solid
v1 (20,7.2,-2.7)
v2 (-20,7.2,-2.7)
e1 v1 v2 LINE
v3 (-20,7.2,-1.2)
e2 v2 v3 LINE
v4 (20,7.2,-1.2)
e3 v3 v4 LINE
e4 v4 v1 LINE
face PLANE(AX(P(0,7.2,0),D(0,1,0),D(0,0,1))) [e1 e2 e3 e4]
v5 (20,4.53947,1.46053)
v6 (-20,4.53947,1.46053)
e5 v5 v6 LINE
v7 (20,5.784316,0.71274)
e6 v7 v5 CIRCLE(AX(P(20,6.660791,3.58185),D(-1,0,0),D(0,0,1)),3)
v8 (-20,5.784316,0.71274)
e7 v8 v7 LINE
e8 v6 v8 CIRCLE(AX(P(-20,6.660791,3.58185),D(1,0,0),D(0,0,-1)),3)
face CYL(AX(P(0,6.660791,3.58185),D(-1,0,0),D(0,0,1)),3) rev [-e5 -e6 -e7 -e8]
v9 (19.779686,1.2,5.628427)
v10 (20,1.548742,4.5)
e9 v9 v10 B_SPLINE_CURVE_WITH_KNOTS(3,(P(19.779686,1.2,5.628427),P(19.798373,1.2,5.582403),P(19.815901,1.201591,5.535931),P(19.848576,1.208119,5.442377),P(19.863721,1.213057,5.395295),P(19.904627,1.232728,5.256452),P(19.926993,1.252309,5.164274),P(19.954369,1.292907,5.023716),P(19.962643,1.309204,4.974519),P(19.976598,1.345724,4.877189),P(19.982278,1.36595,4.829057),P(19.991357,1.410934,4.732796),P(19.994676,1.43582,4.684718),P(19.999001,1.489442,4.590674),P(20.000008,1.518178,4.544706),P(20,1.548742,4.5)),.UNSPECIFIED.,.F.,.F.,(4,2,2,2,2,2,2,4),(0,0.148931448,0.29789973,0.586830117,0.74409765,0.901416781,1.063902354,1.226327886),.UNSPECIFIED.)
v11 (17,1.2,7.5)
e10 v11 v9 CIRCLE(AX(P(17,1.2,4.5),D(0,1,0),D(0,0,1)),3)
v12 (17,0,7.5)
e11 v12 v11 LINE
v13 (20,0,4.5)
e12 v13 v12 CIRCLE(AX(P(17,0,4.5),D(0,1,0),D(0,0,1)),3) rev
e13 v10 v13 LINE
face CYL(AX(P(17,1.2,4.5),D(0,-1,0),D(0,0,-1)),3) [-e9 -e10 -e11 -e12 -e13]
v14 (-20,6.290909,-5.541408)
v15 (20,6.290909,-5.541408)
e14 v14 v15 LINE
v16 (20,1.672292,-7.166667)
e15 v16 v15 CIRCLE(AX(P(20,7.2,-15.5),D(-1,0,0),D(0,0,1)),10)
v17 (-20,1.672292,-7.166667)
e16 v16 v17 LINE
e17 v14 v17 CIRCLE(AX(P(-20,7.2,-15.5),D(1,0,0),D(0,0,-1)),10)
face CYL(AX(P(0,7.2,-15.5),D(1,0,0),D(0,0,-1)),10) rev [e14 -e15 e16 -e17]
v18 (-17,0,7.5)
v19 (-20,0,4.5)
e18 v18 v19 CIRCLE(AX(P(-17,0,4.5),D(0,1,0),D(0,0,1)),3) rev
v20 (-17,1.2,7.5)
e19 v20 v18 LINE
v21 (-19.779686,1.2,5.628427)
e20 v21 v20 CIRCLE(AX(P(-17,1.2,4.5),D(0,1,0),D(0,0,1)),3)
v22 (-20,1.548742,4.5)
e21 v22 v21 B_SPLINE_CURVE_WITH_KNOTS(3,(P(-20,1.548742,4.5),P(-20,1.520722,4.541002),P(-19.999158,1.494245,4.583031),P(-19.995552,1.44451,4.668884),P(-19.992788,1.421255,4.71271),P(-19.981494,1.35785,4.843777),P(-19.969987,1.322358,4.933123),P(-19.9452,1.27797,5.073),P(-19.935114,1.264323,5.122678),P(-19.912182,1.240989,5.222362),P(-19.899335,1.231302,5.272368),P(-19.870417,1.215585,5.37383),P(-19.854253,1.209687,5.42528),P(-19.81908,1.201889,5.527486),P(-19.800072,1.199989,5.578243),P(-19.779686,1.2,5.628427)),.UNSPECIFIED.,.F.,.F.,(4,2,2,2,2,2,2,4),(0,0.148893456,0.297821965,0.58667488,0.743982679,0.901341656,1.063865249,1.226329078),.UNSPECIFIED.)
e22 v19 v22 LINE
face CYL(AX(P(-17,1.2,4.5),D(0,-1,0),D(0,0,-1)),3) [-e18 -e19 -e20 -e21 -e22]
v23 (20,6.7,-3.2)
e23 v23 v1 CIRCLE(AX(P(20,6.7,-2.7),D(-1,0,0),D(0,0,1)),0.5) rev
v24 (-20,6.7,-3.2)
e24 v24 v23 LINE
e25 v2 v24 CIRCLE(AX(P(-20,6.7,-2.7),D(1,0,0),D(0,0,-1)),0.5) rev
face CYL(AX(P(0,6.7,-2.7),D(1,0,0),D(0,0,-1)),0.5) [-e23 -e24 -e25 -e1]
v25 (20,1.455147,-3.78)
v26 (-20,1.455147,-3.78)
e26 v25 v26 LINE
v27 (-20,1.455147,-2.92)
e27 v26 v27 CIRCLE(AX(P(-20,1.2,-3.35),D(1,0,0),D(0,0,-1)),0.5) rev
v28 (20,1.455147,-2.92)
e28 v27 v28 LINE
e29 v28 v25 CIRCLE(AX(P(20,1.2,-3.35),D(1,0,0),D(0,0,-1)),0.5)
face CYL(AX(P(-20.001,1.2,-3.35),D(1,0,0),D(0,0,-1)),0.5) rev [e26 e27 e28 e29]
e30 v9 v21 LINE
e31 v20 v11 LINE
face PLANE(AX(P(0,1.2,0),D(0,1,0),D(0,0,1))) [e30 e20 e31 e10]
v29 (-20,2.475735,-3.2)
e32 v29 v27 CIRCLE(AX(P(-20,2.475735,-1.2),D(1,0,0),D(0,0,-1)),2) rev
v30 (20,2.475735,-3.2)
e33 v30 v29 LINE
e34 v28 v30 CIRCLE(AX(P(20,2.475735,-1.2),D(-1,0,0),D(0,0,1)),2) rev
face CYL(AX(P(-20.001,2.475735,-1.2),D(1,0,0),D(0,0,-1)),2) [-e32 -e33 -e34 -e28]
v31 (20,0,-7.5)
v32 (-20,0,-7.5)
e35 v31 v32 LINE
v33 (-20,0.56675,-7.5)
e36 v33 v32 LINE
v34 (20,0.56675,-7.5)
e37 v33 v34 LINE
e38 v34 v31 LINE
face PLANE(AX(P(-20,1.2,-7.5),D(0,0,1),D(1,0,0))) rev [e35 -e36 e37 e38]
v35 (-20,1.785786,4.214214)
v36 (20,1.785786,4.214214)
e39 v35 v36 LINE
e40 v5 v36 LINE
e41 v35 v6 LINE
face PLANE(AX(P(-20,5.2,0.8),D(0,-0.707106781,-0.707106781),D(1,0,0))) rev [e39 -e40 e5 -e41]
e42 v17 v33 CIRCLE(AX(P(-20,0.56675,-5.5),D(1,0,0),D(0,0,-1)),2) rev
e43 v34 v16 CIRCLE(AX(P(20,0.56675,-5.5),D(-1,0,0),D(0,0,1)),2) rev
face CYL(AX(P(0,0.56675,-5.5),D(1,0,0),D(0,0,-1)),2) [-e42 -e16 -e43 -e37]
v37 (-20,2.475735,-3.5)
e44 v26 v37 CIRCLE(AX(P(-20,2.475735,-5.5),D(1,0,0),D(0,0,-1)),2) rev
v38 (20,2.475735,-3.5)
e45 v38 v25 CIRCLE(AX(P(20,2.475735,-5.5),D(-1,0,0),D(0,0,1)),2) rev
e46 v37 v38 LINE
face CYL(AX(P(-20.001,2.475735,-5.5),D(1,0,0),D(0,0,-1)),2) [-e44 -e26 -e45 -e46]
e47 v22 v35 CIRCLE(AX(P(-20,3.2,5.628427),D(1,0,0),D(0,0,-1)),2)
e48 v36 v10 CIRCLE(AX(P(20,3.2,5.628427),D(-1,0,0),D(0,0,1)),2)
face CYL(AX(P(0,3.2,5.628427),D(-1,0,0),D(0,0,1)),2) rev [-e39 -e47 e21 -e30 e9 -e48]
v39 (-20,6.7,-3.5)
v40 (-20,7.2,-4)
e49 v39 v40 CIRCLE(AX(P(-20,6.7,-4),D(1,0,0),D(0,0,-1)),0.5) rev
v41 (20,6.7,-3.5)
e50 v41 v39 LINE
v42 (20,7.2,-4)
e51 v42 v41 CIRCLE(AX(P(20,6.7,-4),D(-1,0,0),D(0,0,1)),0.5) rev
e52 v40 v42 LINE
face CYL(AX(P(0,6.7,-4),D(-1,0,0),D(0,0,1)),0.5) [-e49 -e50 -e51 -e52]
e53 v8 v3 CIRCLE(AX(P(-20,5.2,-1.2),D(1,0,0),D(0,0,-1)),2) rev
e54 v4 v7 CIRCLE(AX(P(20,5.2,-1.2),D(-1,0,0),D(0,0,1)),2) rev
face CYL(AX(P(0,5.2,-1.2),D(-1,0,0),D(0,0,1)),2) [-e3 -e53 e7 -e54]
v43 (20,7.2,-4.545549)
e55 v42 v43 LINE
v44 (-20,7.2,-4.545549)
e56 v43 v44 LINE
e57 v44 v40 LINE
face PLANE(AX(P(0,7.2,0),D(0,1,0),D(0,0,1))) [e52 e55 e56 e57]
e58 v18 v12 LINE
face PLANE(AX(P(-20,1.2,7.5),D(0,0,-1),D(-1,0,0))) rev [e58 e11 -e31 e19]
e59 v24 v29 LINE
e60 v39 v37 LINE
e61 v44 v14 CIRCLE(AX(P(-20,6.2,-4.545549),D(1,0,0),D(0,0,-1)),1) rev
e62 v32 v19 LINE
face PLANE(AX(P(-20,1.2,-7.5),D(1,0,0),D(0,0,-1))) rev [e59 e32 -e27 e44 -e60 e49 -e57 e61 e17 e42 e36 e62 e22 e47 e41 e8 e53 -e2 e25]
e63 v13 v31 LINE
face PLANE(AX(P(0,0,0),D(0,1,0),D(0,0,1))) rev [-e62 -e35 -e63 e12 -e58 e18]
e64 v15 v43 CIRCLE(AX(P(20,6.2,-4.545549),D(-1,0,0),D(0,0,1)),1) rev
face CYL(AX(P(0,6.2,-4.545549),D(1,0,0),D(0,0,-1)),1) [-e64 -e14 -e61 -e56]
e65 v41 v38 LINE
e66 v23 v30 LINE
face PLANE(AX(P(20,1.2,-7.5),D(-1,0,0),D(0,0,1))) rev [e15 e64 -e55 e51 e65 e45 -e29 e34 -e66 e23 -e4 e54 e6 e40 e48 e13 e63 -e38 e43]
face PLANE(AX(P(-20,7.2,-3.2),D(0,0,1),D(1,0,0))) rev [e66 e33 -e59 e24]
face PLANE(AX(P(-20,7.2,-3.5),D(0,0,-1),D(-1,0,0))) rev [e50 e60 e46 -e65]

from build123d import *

# Parameters (mm, degrees)
SKETCH_1_W          = 40
SKETCH_1_H          = 15
EXTRUDE_1_DEPTH     = 1.2
SKETCH_2_W          = 40
SKETCH_2_H          = 2
SKETCH_2_H_2        = 4
EXTRUDE_2_DEPTH     = 6
FILLET_1_R          = 10
CHAMFER_1_SIZE      = 4
FILLET_2_R          = 2
FILLET_3_R          = 0.5
CUT_EXTRUDE_1_REACH = 43.329
SKETCH_3_R          = 0.5
FILLET_4_R          = 1
FILLET_5_R          = 2
FILLET_6_R          = 3
FILLET_7_R          = 2
FILLET_8_R          = 3


# Some blends are built 0.0001 mm under size
with BuildPart() as part:
    # 草图1 → 凸台-拉伸1 (new body)
    with BuildSketch(Plane(origin=(0, 0, 0), x_dir=(1, 0, 0), z_dir=(0, 1, 0))):
        Rectangle(SKETCH_1_W, SKETCH_1_H)
    extrude(amount=EXTRUDE_1_DEPTH)

    # 草图2 → 凸台-拉伸2 (add)
    with BuildSketch(Plane(origin=(0, 1.2, 0), x_dir=(1, 0, 0), z_dir=(0, 1, 0))):
        with Locations((0, 4.5)):
            Rectangle(SKETCH_2_W, SKETCH_2_H)
        with Locations((0, 1.2)):
            Rectangle(SKETCH_2_W, SKETCH_2_H_2)
    extrude(amount=EXTRUDE_2_DEPTH)

    # 圆角1
    # the kernel refuses this fillet: 10 mm, written as the material it adds along each edge
    with BuildSketch(Plane(origin=(-20, 1.2, -5.5), x_dir=(0, 0, -1), z_dir=(1, 0, 0))) as fillet_1_piece_1:
        with BuildLine():
            CenterArc((10, 6), FILLET_1_R, 180, 36.869897646)
            Line((0, 6), (-0.2, 6))
            Line((-0.2, 6), (-0.2, 0))
            Line((-0.2, 0), (0, -0.2))
            ThreePointArc((0, -0.2), (1, -0.2), (1.84, -0.12))
            Line((1.84, -0.12), (2, 0))
        make_face()
    extrude(amount=40)

    # 倒角1
    chamfer_1_edges = [part.edges().sort_by_distance(p)[0] for p in [
        (0, 1.2, 0.8),
    ]]
    chamfer(chamfer_1_edges, length=CHAMFER_1_SIZE)

    # 圆角2
    fillet_2_edges = [part.edges().sort_by_distance(p)[0] for p in [
        (0, 1.2, 4.8),
        (0, 7.2, 0.8),
    ]]
    fillet(fillet_2_edges, radius=FILLET_2_R - 0.0001)  # a hair under: the kernel refuses the full size

    # 圆角3
    fillet_3_edges = [part.edges().sort_by_distance(p)[0] for p in [
        (0, 7.2, -3.5),
        (0, 7.2, -3.2),
    ]]
    fillet(fillet_3_edges, radius=FILLET_3_R)

    # 草图3 → 切除-拉伸1 (cut, up to next)
    with BuildSketch(Plane(origin=(20, 0, 0), x_dir=(0, 0, -1), z_dir=(1, 0, 0)), mode=Mode.PRIVATE) as cut_extrude_1_sk1:
        with Locations((3.35, 1.2)):
            Circle(SKETCH_3_R)
    cut_extrude_1_tool1 = extrude(cut_extrude_1_sk1.sketch, amount=-CUT_EXTRUDE_1_REACH, mode=Mode.PRIVATE) & part.part
    add(cut_extrude_1_tool1.solids().sort_by_distance((20, 1.2, -3.35))[0], mode=Mode.SUBTRACT)

    # 圆角4
    fillet_4_edges = [part.edges().sort_by_distance(p)[0] for p in [
        (0, 7.2, -5.5),
    ]]
    fillet(fillet_4_edges, radius=FILLET_4_R)

    # 圆角5
    fillet_5_edges = [part.edges().sort_by_distance(p)[0] for p in [
        (0, 1.2, -7.5),
    ]]
    fillet(fillet_5_edges, radius=FILLET_5_R)

    # 圆角6
    fillet_6_edges = [part.edges().sort_by_distance(p)[0] for p in [
        (0, 5.2, 0.8),
    ]]
    fillet(fillet_6_edges, radius=FILLET_6_R)

    # 圆角7
    fillet_7_edges = [part.edges().sort_by_distance(p)[0] for p in [
        (0, 1.676969601, -3.5),
        (0, 1.676969601, -3.2),
    ]]
    fillet(fillet_7_edges, radius=FILLET_7_R)

    # 圆角8
    fillet_8_edges = [part.edges().sort_by_distance(p)[0] for p in [
        (20, 0.6, 7.5),
        (-20, 0.6, 7.5),
    ]]
    fillet(fillet_8_edges, radius=FILLET_8_R)


solid = part.part
